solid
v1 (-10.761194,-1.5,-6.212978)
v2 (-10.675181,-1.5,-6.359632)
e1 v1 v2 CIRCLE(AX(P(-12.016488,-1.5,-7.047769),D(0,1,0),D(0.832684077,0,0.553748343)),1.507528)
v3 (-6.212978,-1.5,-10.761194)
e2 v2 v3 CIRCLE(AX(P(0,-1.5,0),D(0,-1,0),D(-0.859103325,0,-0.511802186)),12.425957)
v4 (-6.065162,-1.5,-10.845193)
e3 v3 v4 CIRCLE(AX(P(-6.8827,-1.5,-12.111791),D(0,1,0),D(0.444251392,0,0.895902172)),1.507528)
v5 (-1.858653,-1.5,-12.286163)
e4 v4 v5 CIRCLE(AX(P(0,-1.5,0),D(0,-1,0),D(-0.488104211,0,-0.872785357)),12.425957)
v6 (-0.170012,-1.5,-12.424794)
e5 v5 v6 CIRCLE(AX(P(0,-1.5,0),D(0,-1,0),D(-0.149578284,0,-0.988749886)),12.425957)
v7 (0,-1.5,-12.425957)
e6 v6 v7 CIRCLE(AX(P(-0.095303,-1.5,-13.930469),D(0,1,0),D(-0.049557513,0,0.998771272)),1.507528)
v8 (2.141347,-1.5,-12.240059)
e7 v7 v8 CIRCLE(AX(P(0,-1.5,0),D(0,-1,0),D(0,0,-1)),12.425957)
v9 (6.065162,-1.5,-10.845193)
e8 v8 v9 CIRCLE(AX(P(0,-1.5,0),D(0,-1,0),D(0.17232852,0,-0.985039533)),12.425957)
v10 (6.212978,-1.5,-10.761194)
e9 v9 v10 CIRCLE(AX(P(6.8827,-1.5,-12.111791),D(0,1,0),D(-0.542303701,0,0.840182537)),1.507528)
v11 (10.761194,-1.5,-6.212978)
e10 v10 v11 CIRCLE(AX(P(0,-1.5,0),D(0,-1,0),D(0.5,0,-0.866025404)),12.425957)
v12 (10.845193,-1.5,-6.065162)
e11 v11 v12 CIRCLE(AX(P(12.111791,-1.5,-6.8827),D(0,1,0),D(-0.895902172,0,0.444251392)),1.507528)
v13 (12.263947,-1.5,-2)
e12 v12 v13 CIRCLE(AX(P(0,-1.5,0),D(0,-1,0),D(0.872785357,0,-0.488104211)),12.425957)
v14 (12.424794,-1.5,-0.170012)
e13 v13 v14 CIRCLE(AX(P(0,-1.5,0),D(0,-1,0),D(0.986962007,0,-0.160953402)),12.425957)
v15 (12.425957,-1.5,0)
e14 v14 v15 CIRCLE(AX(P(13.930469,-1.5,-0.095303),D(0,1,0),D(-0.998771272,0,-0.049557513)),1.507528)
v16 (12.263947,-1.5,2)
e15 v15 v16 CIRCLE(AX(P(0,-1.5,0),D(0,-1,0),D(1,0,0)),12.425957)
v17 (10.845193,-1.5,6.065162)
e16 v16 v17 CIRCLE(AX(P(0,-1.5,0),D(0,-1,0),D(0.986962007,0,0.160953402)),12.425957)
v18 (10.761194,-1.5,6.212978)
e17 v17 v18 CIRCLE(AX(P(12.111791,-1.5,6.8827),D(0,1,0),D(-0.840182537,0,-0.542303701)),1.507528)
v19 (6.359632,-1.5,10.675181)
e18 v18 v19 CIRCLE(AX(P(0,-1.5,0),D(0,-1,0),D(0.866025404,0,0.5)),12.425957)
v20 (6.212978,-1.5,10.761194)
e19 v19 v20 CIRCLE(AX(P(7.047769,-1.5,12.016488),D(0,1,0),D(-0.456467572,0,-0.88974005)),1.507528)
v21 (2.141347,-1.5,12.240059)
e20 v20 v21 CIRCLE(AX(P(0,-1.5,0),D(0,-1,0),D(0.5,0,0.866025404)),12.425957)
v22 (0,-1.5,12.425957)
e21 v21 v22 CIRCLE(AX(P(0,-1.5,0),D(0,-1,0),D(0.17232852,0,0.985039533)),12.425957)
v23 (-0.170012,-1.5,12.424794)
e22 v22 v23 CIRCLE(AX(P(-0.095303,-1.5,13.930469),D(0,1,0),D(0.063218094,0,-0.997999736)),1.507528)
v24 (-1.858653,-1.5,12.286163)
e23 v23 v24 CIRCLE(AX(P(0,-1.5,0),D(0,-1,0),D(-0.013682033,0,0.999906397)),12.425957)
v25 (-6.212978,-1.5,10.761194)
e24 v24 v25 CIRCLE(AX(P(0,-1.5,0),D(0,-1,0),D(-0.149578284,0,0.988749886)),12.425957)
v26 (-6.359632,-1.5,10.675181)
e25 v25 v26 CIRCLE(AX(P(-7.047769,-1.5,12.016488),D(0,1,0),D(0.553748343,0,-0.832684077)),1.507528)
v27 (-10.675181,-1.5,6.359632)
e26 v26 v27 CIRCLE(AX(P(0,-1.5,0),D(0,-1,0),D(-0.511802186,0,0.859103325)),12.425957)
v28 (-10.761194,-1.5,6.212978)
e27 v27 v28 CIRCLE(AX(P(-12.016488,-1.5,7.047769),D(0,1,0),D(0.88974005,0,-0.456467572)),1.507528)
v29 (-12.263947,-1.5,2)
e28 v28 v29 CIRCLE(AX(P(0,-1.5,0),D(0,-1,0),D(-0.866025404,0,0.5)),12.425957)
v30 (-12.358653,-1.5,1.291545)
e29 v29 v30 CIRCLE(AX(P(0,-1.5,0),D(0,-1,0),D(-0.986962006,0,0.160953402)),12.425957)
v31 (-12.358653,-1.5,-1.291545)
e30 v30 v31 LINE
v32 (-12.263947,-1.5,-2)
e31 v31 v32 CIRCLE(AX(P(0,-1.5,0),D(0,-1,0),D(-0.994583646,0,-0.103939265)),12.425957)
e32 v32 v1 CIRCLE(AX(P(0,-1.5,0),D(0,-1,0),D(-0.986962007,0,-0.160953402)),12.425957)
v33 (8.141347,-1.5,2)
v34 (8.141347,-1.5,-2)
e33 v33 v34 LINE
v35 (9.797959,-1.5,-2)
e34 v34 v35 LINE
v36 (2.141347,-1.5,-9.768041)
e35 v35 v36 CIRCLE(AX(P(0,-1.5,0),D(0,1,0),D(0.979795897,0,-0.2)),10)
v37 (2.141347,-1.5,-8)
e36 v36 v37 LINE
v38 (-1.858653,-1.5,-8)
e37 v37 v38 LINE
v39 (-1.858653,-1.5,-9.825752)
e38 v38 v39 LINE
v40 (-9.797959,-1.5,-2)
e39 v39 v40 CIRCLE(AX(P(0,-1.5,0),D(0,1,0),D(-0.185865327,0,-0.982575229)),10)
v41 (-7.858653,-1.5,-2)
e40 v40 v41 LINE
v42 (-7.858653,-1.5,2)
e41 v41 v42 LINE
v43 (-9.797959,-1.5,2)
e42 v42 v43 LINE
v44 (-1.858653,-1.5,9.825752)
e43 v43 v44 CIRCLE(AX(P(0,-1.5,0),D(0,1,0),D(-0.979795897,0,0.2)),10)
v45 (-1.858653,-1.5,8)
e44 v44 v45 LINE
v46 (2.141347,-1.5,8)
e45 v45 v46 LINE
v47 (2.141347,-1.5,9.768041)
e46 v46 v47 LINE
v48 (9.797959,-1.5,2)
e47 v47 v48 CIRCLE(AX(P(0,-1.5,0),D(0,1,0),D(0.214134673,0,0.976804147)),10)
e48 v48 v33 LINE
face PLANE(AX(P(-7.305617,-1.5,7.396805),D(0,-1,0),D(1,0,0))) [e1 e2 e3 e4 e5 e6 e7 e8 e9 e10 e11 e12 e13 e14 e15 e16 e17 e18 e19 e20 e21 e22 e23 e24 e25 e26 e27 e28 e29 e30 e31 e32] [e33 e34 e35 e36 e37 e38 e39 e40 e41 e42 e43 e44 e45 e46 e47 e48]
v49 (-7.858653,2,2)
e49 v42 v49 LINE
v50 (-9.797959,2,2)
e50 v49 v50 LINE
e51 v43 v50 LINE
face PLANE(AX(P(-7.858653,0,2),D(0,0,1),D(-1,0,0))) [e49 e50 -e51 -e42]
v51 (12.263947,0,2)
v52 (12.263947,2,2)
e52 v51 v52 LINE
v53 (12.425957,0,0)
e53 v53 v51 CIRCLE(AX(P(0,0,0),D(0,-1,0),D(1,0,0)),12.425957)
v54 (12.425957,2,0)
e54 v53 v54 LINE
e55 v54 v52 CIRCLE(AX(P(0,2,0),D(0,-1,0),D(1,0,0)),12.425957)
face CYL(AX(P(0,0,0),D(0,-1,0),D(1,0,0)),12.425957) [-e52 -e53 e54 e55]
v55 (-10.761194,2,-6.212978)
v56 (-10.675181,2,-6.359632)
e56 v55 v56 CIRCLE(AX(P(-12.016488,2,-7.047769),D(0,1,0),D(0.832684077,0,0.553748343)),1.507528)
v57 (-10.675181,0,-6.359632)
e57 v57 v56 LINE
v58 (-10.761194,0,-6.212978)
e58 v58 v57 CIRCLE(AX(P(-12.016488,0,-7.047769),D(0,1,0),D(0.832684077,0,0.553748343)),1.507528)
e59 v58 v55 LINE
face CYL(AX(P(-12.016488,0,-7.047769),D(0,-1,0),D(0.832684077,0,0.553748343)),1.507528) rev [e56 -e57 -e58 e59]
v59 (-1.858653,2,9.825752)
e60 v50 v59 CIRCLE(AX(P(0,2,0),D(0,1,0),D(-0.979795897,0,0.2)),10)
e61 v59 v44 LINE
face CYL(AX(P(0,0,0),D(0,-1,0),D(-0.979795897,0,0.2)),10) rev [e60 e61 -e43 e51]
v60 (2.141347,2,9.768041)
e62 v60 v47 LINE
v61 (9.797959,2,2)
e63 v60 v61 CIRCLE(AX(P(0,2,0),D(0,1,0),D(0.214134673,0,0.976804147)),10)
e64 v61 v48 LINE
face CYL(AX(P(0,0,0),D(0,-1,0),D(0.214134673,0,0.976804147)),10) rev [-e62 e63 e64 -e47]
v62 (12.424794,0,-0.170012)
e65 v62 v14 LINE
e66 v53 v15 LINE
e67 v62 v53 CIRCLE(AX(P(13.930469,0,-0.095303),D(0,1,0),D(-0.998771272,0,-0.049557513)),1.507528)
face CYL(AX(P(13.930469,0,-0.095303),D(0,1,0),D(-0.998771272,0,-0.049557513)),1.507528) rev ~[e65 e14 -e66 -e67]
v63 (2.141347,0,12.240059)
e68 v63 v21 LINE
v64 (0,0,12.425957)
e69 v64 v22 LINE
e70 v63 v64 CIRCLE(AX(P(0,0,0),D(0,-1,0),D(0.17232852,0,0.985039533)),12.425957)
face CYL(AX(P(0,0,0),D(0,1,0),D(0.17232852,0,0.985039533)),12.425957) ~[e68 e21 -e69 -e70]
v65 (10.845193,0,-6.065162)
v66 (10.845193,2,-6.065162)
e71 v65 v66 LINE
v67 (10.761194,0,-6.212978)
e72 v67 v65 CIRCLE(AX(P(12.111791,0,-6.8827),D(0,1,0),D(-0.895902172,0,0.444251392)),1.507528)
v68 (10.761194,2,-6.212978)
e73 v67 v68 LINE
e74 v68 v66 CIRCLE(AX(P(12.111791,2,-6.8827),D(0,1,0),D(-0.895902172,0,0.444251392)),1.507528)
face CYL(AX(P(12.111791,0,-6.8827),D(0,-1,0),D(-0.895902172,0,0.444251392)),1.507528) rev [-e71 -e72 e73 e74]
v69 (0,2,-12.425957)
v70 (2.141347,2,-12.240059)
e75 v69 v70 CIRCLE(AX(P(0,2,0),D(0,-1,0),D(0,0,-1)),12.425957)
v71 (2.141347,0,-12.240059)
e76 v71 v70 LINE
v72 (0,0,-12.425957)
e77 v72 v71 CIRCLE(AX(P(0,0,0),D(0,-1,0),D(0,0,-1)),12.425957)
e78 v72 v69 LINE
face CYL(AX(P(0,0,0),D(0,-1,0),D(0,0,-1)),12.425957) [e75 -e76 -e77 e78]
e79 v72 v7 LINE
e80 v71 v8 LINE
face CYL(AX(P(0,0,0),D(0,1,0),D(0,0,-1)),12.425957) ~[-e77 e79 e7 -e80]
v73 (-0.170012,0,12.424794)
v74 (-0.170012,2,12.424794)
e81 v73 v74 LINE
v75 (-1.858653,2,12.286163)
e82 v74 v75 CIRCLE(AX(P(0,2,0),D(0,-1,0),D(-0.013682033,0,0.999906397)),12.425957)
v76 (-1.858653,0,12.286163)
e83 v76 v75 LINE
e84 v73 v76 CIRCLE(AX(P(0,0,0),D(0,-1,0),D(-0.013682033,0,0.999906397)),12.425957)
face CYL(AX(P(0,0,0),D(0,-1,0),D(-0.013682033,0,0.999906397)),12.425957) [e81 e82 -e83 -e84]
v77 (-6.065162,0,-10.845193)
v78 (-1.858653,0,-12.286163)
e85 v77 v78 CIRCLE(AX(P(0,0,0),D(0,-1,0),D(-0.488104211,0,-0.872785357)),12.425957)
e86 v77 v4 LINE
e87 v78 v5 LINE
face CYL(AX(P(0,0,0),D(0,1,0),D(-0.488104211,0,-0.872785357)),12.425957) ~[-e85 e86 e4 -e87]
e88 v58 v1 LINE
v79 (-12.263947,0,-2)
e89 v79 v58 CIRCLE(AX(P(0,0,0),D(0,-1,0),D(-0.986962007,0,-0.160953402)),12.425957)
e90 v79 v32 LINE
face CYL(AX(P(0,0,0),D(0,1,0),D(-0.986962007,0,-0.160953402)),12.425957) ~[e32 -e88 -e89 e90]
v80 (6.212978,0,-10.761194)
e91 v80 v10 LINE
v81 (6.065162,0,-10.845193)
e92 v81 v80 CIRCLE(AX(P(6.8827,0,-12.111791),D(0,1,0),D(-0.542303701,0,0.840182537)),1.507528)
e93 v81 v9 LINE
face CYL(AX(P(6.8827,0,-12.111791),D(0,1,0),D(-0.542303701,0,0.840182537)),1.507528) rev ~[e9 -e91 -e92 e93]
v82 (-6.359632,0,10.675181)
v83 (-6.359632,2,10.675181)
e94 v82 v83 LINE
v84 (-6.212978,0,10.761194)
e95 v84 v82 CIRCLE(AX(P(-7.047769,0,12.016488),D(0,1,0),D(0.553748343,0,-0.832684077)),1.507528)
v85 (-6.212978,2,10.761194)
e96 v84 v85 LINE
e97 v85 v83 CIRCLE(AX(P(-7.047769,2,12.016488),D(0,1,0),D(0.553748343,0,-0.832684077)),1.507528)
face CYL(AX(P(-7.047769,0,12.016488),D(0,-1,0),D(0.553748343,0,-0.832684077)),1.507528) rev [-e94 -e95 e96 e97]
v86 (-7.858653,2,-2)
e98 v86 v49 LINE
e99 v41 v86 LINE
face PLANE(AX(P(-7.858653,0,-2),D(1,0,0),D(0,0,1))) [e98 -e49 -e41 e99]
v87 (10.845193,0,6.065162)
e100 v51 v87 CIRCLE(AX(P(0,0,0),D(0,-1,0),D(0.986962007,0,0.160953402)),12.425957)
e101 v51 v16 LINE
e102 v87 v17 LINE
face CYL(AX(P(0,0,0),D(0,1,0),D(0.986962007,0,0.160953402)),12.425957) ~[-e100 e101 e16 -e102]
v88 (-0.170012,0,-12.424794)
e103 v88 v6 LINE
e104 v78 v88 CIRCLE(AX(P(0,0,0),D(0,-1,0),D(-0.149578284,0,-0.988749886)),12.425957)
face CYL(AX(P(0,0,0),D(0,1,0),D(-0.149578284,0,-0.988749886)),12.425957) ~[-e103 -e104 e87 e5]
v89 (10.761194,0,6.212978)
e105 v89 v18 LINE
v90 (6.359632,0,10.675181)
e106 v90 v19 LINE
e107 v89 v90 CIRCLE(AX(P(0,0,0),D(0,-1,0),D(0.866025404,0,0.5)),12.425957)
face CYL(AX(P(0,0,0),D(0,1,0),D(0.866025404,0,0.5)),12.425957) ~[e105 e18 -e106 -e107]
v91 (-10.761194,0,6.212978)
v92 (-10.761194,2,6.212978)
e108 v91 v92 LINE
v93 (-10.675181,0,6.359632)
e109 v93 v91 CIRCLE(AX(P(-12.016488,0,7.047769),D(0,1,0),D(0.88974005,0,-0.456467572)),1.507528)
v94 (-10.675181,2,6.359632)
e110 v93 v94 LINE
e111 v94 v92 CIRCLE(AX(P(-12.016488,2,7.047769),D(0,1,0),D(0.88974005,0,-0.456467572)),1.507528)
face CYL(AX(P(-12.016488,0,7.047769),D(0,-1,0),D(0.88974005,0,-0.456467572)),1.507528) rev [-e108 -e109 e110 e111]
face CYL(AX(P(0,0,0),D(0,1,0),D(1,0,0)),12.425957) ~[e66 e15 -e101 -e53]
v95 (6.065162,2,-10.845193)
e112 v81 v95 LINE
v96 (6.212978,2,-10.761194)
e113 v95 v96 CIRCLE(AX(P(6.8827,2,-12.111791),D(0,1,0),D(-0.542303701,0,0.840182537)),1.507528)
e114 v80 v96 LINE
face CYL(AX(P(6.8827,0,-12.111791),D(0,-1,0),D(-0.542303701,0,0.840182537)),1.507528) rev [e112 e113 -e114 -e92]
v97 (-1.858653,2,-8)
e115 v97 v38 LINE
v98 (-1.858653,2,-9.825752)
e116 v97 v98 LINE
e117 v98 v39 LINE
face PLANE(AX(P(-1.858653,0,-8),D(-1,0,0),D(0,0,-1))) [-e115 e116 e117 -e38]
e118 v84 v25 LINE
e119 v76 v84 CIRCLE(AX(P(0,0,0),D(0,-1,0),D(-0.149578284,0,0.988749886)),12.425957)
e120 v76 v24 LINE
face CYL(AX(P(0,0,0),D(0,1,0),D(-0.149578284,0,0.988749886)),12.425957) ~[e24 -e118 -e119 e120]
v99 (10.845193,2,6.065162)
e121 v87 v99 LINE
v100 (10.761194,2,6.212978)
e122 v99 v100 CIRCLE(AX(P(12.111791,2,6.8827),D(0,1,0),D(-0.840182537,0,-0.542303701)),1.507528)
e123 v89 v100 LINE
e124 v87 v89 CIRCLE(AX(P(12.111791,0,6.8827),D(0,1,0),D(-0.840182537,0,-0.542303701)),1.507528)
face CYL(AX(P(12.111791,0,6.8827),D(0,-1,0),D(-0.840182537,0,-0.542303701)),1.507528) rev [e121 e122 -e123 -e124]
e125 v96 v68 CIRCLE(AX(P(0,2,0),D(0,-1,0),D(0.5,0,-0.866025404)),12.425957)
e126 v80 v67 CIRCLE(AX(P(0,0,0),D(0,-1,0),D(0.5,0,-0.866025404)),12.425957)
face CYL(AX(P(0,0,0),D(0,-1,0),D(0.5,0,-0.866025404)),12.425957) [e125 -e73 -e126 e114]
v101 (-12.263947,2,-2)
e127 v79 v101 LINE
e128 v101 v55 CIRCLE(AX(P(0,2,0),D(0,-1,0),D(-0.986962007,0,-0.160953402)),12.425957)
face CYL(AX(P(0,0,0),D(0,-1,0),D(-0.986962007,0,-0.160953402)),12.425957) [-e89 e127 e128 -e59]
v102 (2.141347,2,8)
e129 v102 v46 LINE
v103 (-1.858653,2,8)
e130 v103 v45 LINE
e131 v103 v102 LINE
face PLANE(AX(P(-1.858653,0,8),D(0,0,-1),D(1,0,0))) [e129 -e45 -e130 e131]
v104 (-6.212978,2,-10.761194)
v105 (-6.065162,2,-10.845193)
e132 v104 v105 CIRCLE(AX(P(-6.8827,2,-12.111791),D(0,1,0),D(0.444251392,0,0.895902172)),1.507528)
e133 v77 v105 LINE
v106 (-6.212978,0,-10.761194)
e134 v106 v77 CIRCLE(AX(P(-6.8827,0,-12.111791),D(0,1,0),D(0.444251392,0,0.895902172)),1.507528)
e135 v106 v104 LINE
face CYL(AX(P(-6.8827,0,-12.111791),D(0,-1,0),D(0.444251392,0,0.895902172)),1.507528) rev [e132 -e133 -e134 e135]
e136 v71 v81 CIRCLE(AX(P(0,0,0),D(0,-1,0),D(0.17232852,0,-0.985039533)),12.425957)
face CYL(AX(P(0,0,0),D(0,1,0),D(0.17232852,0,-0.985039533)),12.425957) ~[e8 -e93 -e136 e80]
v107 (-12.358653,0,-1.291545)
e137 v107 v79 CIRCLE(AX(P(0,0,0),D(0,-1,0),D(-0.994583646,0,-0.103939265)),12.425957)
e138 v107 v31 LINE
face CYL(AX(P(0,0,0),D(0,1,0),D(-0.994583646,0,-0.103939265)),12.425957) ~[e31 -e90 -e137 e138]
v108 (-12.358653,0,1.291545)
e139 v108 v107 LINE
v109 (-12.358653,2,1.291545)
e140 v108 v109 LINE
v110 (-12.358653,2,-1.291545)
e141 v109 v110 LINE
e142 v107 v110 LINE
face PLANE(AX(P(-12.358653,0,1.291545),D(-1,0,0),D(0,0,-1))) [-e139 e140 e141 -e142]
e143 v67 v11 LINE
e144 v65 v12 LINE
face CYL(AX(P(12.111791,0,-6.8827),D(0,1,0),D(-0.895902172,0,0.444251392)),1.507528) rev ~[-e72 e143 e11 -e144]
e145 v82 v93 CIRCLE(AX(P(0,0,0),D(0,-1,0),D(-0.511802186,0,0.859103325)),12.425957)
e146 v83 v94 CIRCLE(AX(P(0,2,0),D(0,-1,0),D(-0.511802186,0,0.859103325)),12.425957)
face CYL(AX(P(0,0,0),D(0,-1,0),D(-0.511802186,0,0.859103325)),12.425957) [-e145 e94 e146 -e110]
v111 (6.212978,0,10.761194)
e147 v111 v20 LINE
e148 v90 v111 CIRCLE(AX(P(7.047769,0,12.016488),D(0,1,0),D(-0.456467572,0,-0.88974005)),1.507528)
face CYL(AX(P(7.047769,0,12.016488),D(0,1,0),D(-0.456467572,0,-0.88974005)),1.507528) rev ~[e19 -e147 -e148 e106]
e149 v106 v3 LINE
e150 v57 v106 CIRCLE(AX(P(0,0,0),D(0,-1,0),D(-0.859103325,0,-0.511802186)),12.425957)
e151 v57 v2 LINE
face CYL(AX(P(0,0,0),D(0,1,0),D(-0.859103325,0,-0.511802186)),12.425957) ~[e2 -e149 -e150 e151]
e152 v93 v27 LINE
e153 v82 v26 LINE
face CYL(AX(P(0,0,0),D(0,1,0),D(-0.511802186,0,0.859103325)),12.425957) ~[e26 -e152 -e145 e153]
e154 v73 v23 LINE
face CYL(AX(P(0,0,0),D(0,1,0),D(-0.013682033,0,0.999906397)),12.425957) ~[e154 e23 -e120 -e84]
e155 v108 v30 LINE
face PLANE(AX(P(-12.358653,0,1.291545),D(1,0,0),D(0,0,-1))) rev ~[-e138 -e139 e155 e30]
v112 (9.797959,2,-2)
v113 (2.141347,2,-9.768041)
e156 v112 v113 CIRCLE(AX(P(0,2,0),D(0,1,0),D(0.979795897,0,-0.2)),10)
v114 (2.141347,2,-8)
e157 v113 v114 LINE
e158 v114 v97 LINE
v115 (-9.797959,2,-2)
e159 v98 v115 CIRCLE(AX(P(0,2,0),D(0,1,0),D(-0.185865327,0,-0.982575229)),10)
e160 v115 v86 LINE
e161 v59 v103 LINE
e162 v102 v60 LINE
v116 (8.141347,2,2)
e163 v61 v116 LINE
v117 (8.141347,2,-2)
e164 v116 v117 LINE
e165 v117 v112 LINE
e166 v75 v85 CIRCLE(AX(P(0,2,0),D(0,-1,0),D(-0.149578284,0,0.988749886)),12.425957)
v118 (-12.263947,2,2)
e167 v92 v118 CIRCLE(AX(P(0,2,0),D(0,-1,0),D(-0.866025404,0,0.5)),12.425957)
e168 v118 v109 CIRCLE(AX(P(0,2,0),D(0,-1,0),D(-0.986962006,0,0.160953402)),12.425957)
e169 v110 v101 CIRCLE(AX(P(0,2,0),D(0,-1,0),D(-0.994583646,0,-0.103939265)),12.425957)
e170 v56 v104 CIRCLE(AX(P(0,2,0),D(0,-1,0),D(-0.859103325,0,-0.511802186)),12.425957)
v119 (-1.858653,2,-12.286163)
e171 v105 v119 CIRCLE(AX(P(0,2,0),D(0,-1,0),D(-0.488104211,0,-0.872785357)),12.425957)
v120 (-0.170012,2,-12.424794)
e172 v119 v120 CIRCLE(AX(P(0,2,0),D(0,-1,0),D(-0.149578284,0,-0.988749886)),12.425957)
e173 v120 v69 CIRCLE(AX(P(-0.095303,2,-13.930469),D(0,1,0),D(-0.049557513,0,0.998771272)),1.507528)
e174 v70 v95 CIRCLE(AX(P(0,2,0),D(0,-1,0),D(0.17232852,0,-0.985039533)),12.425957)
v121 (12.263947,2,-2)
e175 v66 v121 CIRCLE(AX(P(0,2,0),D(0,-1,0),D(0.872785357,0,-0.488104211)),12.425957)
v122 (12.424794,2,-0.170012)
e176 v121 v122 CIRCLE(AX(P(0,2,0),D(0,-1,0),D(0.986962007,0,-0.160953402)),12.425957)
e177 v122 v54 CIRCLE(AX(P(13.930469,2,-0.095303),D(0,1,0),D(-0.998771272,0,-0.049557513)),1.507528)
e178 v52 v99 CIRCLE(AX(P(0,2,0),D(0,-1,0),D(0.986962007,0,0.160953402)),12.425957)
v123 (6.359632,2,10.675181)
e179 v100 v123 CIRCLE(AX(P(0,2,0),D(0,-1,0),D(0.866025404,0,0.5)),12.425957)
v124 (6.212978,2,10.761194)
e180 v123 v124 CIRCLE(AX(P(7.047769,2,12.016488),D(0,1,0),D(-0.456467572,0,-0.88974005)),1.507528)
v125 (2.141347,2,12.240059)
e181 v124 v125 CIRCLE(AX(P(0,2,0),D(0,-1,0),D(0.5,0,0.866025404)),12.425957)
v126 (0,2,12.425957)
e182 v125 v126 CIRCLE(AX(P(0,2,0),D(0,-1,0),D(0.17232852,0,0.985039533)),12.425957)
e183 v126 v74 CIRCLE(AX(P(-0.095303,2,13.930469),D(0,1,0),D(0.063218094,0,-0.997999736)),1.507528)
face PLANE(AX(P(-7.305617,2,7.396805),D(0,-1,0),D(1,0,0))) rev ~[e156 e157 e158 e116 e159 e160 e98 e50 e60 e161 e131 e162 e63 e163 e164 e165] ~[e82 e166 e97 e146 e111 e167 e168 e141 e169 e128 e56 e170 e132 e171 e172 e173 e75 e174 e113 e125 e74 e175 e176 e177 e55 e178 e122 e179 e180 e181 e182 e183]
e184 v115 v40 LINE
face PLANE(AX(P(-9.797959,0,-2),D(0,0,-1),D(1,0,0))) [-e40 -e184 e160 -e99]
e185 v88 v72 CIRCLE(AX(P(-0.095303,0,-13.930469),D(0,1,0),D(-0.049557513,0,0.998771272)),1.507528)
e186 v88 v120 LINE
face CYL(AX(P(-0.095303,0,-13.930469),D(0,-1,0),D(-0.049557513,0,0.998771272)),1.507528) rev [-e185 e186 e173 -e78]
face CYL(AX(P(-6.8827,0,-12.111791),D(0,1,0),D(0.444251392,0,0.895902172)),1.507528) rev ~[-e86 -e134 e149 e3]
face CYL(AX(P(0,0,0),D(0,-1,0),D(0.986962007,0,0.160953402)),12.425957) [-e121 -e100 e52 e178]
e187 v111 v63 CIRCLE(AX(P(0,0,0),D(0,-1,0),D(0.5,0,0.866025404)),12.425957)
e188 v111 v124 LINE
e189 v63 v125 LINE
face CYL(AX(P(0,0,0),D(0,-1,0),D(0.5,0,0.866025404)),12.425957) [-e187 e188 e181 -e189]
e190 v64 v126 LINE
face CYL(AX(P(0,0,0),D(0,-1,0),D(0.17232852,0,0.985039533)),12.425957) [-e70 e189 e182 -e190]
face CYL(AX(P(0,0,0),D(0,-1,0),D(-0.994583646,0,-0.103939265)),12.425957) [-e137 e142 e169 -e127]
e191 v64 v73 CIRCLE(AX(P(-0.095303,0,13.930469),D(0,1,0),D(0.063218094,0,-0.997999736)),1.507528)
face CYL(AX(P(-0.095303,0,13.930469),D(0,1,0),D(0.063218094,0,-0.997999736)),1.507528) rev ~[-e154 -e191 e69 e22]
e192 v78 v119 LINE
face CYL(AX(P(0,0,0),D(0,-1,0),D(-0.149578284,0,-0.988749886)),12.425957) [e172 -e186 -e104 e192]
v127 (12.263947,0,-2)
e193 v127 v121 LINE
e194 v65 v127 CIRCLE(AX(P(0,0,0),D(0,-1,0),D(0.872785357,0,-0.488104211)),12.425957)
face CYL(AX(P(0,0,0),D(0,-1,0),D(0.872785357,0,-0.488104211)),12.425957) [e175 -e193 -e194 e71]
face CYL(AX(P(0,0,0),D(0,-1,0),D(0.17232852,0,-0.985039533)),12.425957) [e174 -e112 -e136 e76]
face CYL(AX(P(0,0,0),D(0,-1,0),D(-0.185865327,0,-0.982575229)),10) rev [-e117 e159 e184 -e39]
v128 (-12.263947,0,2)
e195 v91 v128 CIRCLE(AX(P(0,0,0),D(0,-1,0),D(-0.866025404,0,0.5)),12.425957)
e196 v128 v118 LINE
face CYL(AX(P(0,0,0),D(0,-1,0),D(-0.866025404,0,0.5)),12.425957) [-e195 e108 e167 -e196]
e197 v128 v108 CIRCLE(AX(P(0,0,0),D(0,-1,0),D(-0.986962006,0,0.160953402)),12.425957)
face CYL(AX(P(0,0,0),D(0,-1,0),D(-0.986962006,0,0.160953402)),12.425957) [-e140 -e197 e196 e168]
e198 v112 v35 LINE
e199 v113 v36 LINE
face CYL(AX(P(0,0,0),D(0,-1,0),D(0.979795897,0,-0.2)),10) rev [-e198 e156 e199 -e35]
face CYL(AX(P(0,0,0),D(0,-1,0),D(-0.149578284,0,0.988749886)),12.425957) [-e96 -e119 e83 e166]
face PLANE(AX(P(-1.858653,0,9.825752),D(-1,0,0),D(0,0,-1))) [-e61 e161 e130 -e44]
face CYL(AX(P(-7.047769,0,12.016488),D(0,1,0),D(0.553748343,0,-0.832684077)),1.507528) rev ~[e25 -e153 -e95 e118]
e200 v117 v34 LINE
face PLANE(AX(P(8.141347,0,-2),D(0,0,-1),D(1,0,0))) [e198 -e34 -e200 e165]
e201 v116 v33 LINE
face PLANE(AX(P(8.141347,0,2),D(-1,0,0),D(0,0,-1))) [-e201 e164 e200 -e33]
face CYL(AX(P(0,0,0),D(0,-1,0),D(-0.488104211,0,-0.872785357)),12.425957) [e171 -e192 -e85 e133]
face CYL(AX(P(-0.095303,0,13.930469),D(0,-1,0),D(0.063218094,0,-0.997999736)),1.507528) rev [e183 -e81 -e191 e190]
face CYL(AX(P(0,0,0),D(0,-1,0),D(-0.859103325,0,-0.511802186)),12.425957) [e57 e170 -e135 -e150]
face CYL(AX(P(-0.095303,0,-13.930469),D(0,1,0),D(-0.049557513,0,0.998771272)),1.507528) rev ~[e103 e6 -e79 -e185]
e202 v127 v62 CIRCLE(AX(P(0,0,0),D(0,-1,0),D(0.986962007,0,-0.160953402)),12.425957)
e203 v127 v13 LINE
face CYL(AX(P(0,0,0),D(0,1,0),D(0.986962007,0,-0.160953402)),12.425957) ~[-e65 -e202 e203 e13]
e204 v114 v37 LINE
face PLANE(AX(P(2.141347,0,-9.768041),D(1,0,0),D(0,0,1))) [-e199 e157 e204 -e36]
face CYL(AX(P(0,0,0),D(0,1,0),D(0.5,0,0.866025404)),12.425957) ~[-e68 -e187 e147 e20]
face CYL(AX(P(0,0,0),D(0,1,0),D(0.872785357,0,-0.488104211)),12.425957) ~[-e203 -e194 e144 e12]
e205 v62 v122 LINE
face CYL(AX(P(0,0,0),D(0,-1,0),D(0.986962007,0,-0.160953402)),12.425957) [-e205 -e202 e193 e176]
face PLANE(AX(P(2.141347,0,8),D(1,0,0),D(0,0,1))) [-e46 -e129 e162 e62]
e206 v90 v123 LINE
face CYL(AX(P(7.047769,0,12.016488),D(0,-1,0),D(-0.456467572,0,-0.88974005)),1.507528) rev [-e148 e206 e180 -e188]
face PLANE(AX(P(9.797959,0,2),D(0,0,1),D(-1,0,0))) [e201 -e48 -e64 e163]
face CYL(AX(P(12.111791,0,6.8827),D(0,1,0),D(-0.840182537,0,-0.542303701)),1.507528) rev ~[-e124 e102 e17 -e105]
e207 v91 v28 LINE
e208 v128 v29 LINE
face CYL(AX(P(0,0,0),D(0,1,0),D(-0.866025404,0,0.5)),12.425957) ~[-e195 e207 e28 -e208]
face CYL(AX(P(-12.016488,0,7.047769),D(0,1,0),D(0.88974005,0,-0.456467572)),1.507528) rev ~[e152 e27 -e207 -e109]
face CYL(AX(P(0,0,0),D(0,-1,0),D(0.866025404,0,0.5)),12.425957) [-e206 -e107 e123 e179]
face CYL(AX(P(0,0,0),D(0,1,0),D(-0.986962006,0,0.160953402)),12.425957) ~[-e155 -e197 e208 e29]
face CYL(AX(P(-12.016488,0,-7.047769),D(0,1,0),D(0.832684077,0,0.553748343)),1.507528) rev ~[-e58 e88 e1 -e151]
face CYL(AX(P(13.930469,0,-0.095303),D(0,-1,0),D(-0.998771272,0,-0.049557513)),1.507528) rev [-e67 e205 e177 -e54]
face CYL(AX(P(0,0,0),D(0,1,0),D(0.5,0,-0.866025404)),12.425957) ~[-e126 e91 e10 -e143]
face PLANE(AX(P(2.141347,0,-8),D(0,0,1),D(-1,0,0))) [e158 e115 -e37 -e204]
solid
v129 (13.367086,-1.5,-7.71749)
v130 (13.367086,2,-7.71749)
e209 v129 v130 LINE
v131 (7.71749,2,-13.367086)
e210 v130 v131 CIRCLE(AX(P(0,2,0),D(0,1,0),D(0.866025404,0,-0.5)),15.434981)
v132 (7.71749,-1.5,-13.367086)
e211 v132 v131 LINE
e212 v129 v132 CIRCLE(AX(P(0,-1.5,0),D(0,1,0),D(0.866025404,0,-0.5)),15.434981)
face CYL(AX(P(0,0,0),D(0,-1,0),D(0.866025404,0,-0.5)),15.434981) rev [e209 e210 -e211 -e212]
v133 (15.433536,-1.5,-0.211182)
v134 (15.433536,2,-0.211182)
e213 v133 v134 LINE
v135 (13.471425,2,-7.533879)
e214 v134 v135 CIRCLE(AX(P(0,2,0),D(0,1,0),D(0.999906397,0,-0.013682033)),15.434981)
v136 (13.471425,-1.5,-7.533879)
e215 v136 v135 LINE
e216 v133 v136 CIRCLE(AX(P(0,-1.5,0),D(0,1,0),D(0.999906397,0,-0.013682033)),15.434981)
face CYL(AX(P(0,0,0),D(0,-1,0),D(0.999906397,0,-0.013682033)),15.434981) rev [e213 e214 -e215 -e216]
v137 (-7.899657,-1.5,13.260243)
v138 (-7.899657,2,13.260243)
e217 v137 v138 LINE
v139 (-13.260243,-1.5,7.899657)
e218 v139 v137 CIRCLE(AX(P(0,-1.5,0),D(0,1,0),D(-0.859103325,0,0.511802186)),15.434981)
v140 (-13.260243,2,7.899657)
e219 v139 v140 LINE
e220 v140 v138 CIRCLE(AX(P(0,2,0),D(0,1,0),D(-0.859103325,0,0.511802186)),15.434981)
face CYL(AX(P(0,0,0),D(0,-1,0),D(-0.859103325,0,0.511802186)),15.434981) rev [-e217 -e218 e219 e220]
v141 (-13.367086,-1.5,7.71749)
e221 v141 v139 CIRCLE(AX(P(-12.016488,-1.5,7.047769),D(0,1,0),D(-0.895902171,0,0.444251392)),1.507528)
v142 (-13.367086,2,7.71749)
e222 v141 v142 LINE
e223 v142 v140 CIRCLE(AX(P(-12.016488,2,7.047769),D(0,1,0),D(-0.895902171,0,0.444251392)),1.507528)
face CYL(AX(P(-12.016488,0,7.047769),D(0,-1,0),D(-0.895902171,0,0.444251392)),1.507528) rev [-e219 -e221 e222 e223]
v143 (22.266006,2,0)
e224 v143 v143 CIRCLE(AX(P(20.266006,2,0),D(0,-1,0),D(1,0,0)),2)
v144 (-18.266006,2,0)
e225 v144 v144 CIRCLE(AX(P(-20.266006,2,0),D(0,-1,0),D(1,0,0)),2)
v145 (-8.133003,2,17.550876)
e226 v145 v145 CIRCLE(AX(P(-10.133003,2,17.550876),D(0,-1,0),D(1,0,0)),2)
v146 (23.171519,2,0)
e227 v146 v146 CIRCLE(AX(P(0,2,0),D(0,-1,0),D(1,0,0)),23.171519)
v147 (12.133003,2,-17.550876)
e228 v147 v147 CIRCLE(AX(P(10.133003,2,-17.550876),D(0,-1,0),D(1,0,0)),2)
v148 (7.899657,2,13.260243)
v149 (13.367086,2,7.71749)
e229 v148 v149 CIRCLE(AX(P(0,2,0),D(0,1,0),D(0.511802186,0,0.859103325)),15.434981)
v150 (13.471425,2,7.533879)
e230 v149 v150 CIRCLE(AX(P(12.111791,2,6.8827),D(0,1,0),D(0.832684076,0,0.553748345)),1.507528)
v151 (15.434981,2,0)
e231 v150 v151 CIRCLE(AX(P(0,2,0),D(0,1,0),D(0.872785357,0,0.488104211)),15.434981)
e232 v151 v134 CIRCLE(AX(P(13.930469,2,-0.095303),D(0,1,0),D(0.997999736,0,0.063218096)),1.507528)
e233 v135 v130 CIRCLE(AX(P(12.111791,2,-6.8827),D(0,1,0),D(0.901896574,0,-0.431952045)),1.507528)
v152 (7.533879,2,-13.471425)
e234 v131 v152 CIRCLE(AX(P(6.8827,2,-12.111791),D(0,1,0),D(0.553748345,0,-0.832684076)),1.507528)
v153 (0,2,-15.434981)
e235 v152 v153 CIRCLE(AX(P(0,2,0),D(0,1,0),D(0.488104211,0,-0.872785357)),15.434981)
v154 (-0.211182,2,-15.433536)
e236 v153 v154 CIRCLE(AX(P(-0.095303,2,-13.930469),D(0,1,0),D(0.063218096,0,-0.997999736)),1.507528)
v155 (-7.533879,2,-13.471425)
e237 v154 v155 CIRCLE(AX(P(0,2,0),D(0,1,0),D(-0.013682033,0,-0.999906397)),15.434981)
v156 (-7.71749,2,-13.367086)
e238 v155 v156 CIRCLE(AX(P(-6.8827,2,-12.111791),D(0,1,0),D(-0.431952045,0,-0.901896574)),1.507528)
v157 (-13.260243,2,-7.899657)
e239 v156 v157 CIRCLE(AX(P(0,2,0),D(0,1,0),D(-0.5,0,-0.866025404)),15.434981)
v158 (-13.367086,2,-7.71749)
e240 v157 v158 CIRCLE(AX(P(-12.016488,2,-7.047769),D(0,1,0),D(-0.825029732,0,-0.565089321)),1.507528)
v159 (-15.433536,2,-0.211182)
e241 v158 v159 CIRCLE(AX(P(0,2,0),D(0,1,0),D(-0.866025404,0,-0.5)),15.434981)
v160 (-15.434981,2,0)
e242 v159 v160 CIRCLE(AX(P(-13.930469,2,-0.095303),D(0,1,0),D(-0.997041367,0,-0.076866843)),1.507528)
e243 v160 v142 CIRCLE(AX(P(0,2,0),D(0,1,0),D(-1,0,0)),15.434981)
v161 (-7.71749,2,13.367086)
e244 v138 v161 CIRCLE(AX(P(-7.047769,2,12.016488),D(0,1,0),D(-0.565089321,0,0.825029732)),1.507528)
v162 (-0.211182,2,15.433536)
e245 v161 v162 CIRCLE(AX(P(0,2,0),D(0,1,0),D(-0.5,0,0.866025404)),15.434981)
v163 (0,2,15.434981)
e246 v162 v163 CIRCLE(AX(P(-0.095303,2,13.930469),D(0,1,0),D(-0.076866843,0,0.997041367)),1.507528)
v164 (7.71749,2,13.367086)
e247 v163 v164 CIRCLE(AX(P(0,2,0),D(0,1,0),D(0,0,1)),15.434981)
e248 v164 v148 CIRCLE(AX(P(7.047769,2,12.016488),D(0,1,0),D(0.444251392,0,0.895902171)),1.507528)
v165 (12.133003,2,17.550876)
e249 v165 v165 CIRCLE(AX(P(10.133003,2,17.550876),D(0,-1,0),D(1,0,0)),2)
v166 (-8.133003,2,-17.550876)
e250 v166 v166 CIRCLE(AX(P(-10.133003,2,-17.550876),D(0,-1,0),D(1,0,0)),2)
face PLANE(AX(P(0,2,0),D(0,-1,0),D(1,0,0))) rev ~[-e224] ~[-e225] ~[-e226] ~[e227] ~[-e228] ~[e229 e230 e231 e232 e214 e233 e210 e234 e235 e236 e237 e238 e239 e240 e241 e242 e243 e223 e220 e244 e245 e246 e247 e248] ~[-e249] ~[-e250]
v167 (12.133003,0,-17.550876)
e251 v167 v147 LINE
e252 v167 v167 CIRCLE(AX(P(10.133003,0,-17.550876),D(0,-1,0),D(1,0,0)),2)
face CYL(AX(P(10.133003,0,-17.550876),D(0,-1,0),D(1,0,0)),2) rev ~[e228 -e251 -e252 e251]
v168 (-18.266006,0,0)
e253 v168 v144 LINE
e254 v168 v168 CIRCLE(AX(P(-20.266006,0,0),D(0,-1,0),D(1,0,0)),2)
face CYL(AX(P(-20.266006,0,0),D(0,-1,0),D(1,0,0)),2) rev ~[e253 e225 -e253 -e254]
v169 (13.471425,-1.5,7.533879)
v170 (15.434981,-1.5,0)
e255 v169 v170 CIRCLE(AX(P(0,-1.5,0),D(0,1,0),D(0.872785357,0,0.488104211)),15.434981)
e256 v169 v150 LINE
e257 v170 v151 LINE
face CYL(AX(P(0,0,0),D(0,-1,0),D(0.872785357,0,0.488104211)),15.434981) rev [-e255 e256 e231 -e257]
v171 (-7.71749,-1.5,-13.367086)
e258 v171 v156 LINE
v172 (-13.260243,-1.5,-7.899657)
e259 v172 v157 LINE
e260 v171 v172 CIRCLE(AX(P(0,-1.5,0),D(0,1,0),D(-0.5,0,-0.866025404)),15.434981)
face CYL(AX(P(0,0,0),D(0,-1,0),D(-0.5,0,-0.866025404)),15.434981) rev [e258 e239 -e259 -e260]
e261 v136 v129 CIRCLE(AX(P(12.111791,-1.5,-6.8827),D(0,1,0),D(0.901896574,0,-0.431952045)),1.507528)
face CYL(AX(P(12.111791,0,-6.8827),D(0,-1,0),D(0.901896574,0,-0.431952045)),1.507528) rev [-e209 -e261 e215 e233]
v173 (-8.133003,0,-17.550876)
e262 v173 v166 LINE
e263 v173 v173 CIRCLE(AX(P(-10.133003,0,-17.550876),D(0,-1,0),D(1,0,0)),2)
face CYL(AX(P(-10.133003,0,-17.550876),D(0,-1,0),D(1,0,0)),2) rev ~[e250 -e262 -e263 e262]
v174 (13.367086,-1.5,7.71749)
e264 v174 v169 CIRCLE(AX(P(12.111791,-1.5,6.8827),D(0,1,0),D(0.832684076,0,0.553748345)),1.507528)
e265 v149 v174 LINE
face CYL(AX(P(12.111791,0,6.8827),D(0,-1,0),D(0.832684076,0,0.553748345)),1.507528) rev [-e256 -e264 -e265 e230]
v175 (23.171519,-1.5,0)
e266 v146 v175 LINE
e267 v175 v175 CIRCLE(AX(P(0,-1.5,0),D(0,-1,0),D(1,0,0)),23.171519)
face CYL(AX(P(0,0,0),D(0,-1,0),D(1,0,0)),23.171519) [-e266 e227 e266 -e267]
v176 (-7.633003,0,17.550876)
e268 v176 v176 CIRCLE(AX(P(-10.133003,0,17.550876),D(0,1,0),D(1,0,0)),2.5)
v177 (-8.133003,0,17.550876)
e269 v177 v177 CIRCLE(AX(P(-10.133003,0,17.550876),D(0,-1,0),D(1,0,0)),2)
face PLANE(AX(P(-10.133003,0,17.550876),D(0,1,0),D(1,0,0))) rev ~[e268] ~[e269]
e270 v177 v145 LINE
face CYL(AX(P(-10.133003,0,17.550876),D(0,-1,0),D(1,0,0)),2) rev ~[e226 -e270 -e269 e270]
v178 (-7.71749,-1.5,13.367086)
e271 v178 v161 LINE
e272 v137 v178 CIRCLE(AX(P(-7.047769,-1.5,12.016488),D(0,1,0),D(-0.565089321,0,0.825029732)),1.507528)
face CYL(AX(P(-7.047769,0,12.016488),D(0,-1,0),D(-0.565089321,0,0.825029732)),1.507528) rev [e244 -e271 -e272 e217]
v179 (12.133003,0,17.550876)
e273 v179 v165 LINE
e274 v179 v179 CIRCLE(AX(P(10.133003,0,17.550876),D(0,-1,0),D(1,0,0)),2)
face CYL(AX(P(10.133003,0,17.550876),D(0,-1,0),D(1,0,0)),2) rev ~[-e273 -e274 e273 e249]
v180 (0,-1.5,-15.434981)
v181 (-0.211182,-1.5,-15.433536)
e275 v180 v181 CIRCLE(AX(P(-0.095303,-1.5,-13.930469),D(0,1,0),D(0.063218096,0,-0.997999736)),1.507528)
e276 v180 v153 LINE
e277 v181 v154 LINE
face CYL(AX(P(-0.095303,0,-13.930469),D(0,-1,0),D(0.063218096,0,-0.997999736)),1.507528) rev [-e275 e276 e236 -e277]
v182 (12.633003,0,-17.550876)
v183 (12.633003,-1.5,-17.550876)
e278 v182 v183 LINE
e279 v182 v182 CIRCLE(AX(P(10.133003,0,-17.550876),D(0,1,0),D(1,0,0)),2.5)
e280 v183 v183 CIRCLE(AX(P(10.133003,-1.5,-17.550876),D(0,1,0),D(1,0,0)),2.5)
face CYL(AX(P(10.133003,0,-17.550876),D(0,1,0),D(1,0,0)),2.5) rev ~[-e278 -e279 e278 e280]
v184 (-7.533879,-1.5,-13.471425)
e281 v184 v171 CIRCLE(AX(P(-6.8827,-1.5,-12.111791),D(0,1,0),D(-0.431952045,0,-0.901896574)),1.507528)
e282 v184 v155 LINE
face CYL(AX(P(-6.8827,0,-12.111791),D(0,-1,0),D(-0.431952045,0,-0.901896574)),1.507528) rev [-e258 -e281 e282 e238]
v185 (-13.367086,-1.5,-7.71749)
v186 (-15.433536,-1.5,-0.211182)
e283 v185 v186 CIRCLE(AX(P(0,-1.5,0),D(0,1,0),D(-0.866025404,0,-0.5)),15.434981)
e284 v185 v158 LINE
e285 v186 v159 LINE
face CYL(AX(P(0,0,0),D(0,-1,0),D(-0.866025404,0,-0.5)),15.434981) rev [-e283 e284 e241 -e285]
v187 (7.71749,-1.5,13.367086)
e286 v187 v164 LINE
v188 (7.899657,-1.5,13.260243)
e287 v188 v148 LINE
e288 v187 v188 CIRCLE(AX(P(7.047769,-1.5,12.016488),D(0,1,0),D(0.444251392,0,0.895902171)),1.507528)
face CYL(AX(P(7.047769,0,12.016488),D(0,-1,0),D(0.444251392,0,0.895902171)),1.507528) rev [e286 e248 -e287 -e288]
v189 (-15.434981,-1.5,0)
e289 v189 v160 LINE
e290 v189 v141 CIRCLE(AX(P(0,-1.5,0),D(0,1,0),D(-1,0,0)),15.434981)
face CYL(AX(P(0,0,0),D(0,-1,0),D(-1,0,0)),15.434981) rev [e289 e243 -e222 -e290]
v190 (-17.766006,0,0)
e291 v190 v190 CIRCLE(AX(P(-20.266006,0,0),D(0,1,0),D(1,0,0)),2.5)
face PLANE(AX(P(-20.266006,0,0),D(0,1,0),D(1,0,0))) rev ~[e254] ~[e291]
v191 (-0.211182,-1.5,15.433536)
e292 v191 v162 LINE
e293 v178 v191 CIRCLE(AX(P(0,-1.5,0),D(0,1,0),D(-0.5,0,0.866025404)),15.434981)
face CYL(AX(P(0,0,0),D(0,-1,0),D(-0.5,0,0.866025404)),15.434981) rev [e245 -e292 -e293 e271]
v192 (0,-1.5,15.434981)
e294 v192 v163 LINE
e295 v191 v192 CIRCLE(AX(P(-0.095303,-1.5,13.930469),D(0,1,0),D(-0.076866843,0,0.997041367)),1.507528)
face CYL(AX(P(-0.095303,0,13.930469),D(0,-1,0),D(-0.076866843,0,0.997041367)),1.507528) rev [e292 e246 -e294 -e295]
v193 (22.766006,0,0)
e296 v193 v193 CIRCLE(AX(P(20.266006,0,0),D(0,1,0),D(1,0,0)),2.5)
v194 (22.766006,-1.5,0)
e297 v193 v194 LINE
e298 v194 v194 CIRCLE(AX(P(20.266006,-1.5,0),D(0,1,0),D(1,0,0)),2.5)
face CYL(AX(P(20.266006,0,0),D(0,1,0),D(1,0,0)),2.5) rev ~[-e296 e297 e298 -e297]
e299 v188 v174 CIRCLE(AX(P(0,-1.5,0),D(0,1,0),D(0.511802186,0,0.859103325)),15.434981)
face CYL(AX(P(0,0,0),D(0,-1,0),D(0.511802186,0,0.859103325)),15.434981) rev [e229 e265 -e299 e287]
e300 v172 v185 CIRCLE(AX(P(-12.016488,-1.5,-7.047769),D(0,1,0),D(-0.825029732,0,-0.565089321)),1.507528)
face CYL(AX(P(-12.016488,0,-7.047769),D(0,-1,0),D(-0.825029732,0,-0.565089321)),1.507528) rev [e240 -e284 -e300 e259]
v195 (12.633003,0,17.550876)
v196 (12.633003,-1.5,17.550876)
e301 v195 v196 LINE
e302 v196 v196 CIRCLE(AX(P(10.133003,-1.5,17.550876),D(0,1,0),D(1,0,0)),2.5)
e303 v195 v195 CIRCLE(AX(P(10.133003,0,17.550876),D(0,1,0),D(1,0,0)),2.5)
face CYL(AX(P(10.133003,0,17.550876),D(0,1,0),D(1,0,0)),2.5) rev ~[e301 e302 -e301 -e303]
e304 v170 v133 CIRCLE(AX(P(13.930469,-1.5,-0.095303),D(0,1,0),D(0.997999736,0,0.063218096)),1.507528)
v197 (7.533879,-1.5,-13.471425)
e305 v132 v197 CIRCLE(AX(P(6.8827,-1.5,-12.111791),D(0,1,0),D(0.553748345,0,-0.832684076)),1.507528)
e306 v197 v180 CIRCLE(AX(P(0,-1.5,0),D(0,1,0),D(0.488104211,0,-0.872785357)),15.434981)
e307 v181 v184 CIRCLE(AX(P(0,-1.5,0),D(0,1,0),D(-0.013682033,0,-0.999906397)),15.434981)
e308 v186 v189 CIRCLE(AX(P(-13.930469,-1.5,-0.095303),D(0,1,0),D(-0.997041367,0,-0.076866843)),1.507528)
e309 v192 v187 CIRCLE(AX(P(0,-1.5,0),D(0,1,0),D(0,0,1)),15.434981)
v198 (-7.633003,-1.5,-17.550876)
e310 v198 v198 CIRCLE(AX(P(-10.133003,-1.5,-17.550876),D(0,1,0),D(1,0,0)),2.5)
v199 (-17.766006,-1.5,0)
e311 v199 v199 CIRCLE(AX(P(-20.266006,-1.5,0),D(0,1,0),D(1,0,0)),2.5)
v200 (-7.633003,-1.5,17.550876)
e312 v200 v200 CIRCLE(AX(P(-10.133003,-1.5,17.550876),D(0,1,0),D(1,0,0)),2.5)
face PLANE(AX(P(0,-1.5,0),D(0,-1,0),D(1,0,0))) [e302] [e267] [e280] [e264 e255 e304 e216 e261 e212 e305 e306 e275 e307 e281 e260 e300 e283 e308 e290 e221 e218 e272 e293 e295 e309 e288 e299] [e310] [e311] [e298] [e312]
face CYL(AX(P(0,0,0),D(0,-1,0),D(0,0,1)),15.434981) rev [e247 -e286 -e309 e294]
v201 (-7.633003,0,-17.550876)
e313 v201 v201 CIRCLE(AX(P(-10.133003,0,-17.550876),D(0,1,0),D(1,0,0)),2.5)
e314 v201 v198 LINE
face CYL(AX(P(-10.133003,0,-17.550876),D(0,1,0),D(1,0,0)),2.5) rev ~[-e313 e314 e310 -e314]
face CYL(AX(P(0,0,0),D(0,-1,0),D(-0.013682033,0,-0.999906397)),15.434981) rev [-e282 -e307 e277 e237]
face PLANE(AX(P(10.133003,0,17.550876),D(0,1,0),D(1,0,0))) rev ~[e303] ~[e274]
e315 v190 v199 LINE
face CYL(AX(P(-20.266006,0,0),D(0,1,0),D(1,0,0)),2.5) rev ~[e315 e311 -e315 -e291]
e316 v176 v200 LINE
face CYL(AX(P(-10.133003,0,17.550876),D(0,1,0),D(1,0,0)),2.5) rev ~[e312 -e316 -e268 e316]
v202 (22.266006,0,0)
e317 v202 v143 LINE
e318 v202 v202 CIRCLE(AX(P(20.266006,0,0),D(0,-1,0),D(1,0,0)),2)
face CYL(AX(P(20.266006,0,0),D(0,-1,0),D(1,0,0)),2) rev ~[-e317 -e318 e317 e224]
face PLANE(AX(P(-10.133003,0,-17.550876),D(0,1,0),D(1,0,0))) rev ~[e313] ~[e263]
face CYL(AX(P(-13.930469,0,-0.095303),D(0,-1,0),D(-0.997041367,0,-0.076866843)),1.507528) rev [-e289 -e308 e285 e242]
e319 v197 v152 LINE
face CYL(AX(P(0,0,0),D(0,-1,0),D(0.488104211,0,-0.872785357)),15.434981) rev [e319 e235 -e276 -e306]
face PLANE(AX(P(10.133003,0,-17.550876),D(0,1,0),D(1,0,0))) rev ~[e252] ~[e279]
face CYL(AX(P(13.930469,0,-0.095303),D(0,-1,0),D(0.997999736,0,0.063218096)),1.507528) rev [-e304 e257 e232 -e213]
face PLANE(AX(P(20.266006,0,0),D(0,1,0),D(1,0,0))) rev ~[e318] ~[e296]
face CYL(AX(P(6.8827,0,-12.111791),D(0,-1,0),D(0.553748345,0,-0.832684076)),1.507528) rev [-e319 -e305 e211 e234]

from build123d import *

# Parameters (mm, degrees)
F1_DEPTH      = 1.5
F1_DEPTH_BACK = 2
F0_R          = 23.1715188415
F14_D         = 4
F14_DEPTH     = 2.001
F15_D         = 5
F15_DEPTH     = 2
F15_TIP       = 1.5021515476


# Not quite as in the source:
# - the program builds the solid bodies; features that only make, move or delete a surface that nothing else refers to are left out


with BuildPart() as f1:
    # F0 (on Front) → F1 (new body, two sides)
    with BuildSketch(Plane.XZ) as f1_sk:
        with BuildLine():
            ThreePointArc((-9.7979589711, 2), (-7.0199538443, 7.1218149389), (-1.8586532747, 9.8257522869))
            Line((-1.8586532747, 9.8257522869), (-1.8586532747, 12.2861632234))
            ThreePointArc((-1.8586532747, 12.2861632234), (-4.1072121765, 11.7275405301), (-6.2129783266, 10.761194128))
            ThreePointArc((-6.2129783266, 10.761194128), (-6.2850915316, 10.7161183391), (-6.3596317791, 10.6751806721))
            ThreePointArc((-6.3596317791, 10.6751806721), (-8.7864782122, 8.7864782122), (-10.6751806721, 6.3596317791))
            ThreePointArc((-10.6751806721, 6.3596317791), (-10.7161183391, 6.2850915316), (-10.761194128, 6.2129783266))
            ThreePointArc((-10.761194128, 6.2129783266), (-11.7036993668, 4.174664044), (-12.2639471113, 2))
            Line((-12.2639471113, 2), (-9.7979589711, 2))
        make_face()
        with BuildLine():
            ThreePointArc((-9.7979589711, -2), (-10, 0), (-9.7979589711, 2))
            Line((-9.7979589711, 2), (-12.2639471113, 2))
            ThreePointArc((-12.2639471113, 2), (-12.3163951558, 1.6464534963), (-12.3586532747, 1.2915448051))
            Line((-12.3586532747, 1.2915448051), (-12.3586532747, -1.2915448051))
            ThreePointArc((-12.3586532747, -1.2915448051), (-12.3163951558, -1.6464534963), (-12.2639471113, -2))
            Line((-12.2639471113, -2), (-9.7979589711, -2))
        make_face()
        with BuildLine():
            Line((-7.8586532747, 2), (-9.7979589711, 2))
            ThreePointArc((-9.7979589711, 2), (-10, 0), (-9.7979589711, -2))
            Line((-9.7979589711, -2), (-7.8586532747, -2))
            Line((-7.8586532747, -2), (-7.8586532747, 2))
        make_face()
        with BuildLine():
            Line((-1.8586532747, -12.2861632234), (-1.8586532747, -9.8257522869))
            ThreePointArc((-1.8586532747, -9.8257522869), (-7.0199538443, -7.1218149389), (-9.7979589711, -2))
            Line((-9.7979589711, -2), (-12.2639471113, -2))
            ThreePointArc((-12.2639471113, -2), (-11.7036993668, -4.174664044), (-10.761194128, -6.2129783266))
            ThreePointArc((-10.761194128, -6.2129783266), (-10.7161183391, -6.2850915316), (-10.6751806721, -6.3596317791))
            ThreePointArc((-10.6751806721, -6.3596317791), (-8.7261627517, -8.8463824459), (-6.2129783266, -10.761194128))
            ThreePointArc((-6.2129783266, -10.761194128), (-6.1378849458, -10.801108101), (-6.0651617625, -10.8451930155))
            ThreePointArc((-6.0651617625, -10.8451930155), (-4.02688589, -11.7553642554), (-1.8586532747, -12.2861632234))
        make_face()
        with BuildLine():
            Line((2.1413467253, -12.2400585354), (2.1413467253, -9.7680414722))
            ThreePointArc((2.1413467253, -9.7680414722), (0.144262023, -9.9989593693), (-1.8586532747, -9.8257522869))
            Line((-1.8586532747, -9.8257522869), (-1.8586532747, -12.2861632234))
            ThreePointArc((-1.8586532747, -12.2861632234), (-1.0166984011, -12.3842934037), (-0.1700123434, -12.4247935416))
            ThreePointArc((-0.1700123434, -12.4247935416), (-0.0849897619, -12.4229764774), (0, -12.4259566532))
            ThreePointArc((0, -12.4259566532), (1.0747004127, -12.3793948871), (2.1413467253, -12.2400585354))
        make_face()
        with BuildLine():
            ThreePointArc((-1.8586532747, -9.8257522869), (0.144262023, -9.9989593693), (2.1413467253, -9.7680414722))
            Line((2.1413467253, -9.7680414722), (2.1413467253, -8))
            Line((2.1413467253, -8), (-1.8586532747, -8))
            Line((-1.8586532747, -8), (-1.8586532747, -9.8257522869))
        make_face()
        with BuildLine():
            Line((12.2639471113, -2), (9.7979589711, -2))
            ThreePointArc((9.7979589711, -2), (7.1219640694, -7.0198025466), (2.1413467253, -9.7680414722))
            Line((2.1413467253, -9.7680414722), (2.1413467253, -12.2400585354))
            ThreePointArc((2.1413467253, -12.2400585354), (4.1621037763, -11.708171971), (6.0651617625, -10.8451930155))
            ThreePointArc((6.0651617625, -10.8451930155), (6.1378849458, -10.801108101), (6.2129783266, -10.761194128))
            ThreePointArc((6.2129783266, -10.761194128), (8.7864782122, -8.7864782122), (10.761194128, -6.2129783266))
            ThreePointArc((10.761194128, -6.2129783266), (10.801108101, -6.1378849458), (10.8451930155, -6.0651617625))
            ThreePointArc((10.8451930155, -6.0651617625), (11.7319851001, -4.0944992807), (12.2639471113, -2))
        make_face()
        with BuildLine():
            ThreePointArc((9.7979589711, 2), (9.9493615301, 1.0050896201), (10, 0))
            ThreePointArc((10, 0), (9.9493615301, -1.0050896201), (9.7979589711, -2))
            Line((9.7979589711, -2), (12.2639471113, -2))
            ThreePointArc((12.2639471113, -2), (12.3782346262, -1.0879826681), (12.4247935416, -0.1700123434))
            ThreePointArc((12.4247935416, -0.1700123434), (12.4229764774, -0.0849897619), (12.4259566532, 0))
            ThreePointArc((12.4259566532, 0), (12.385388043, 1.0032755219), (12.2639471113, 2))
            Line((12.2639471113, 2), (9.7979589711, 2))
        make_face()
        with BuildLine():
            ThreePointArc((9.7979589711, -2), (9.9493615301, -1.0050896201), (10, 0))
            ThreePointArc((10, 0), (9.9493615301, 1.0050896201), (9.7979589711, 2))
            Line((9.7979589711, 2), (8.1413467253, 2))
            Line((8.1413467253, 2), (8.1413467253, -2))
            Line((8.1413467253, -2), (9.7979589711, -2))
        make_face()
        with BuildLine():
            ThreePointArc((2.1413467253, 9.7680414722), (7.1219640694, 7.0198025466), (9.7979589711, 2))
            Line((9.7979589711, 2), (12.2639471113, 2))
            ThreePointArc((12.2639471113, 2), (11.7319851001, 4.0944992807), (10.8451930155, 6.0651617625))
            ThreePointArc((10.8451930155, 6.0651617625), (10.801108101, 6.1378849458), (10.761194128, 6.2129783266))
            ThreePointArc((10.761194128, 6.2129783266), (8.8463824459, 8.7261627517), (6.3596317791, 10.6751806721))
            ThreePointArc((6.3596317791, 10.6751806721), (6.2850915316, 10.7161183391), (6.2129783266, 10.761194128))
            ThreePointArc((6.2129783266, 10.761194128), (4.2421040478, 11.6794243007), (2.1413467253, 12.2400585354))
            Line((2.1413467253, 12.2400585354), (2.1413467253, 9.7680414722))
        make_face()
        with BuildLine():
            ThreePointArc((-1.8586532747, 9.8257522869), (0.144262023, 9.9989593693), (2.1413467253, 9.7680414722))
            Line((2.1413467253, 9.7680414722), (2.1413467253, 12.2400585354))
            ThreePointArc((2.1413467253, 12.2400585354), (1.0747004127, 12.3793948871), (0, 12.4259566532))
            ThreePointArc((0, 12.4259566532), (-0.0849897619, 12.4229764774), (-0.1700123434, 12.4247935416))
            ThreePointArc((-0.1700123434, 12.4247935416), (-1.0166984011, 12.3842934037), (-1.8586532747, 12.2861632234))
            Line((-1.8586532747, 12.2861632234), (-1.8586532747, 9.8257522869))
        make_face()
        with BuildLine():
            Line((2.1413467253, 8), (2.1413467253, 9.7680414722))
            ThreePointArc((2.1413467253, 9.7680414722), (0.144262023, 9.9989593693), (-1.8586532747, 9.8257522869))
            Line((-1.8586532747, 9.8257522869), (-1.8586532747, 8))
            Line((-1.8586532747, 8), (2.1413467253, 8))
        make_face()
    extrude(amount=F1_DEPTH)
    extrude(f1_sk.sketch, amount=-F1_DEPTH_BACK)


with BuildPart() as f1b:
    # F0 (on Front) → F1, piece 2 (new body, two sides)
    with BuildSketch(Plane.XZ) as f1_2_sk:
        Circle(F0_R)
        Polygon((10.1330032136, 17.5508763992), (20.2660064272, 0), (10.1330032136, -17.5508763992), (-10.1330032136, -17.5508763992), (-20.2660064272, 0), (-10.1330032136, 17.5508763992), align=None, mode=Mode.SUBTRACT)
        Polygon((10.1330032136, -17.5508763992), (20.2660064272, 0), (10.1330032136, 17.5508763992), (-10.1330032136, 17.5508763992), (-20.2660064272, 0), (-10.1330032136, -17.5508763992), align=None)
        with BuildLine():
            ThreePointArc((13.3670856415, 7.7174904934), (13.4224746928, 7.6275141941), (13.4714253931, 7.5338792094))
            ThreePointArc((13.4714253931, 7.5338792094), (14.936027465, 3.8927781375), (15.4349809868, 0))
            ThreePointArc((15.4349809868, 0), (15.4379611627, -0.1056162866), (15.4335362203, -0.2111819122))
            ThreePointArc((15.4335362203, -0.2111819122), (14.9090467635, -3.9948670402), (13.4714253931, -7.5338792094))
            ThreePointArc((13.4714253931, -7.5338792094), (13.4224746928, -7.6275141941), (13.3670856415, -7.7174904934))
            ThreePointArc((13.3670856415, -7.7174904934), (10.9141797233, -10.9141797233), (7.7174904934, -13.3670856415))
            ThreePointArc((7.7174904934, -13.3670856415), (7.6275141941, -13.4224746928), (7.5338792094, -13.4714253931))
            ThreePointArc((7.5338792094, -13.4714253931), (3.8927781375, -14.936027465), (0, -15.4349809868))
            ThreePointArc((0, -15.4349809868), (-0.1056162866, -15.4379611627), (-0.2111819122, -15.4335362203))
            ThreePointArc((-0.2111819122, -15.4335362203), (-3.9948670402, -14.9090467635), (-7.5338792094, -13.4714253931))
            ThreePointArc((-7.5338792094, -13.4714253931), (-7.6275141941, -13.4224746928), (-7.7174904934, -13.3670856415))
            ThreePointArc((-7.7174904934, -13.3670856415), (-10.8392584909, -10.9885901476), (-13.2602434809, -7.899657011))
            ThreePointArc((-13.2602434809, -7.899657011), (-13.3168584062, -7.8104469685), (-13.3670856415, -7.7174904934))
            ThreePointArc((-13.3670856415, -7.7174904934), (-14.8813682851, -4.0967689742), (-15.4335362203, -0.2111819122))
            ThreePointArc((-15.4335362203, -0.2111819122), (-15.4379611627, -0.1056162866), (-15.4349809868, 0))
            ThreePointArc((-15.4349809868, 0), (-14.9090467635, 3.9948670402), (-13.3670856415, 7.7174904934))
            ThreePointArc((-13.3670856415, 7.7174904934), (-13.3168584062, 7.8104469685), (-13.2602434809, 7.899657011))
            ThreePointArc((-13.2602434809, 7.899657011), (-10.9141797233, 10.9141797233), (-7.899657011, 13.2602434809))
            ThreePointArc((-7.899657011, 13.2602434809), (-7.8104469685, 13.3168584062), (-7.7174904934, 13.3670856415))
            ThreePointArc((-7.7174904934, 13.3670856415), (-4.0967689742, 14.8813682851), (-0.2111819122, 15.4335362203))
            ThreePointArc((-0.2111819122, 15.4335362203), (-0.1056162866, 15.4379611627), (0, 15.4349809868))
            ThreePointArc((0, 15.4349809868), (3.9948670402, 14.9090467635), (7.7174904934, 13.3670856415))
            ThreePointArc((7.7174904934, 13.3670856415), (7.8104469685, 13.3168584062), (7.899657011, 13.2602434809))
            ThreePointArc((7.899657011, 13.2602434809), (10.9885901476, 10.8392584909), (13.3670856415, 7.7174904934))
        make_face(mode=Mode.SUBTRACT)
    extrude(amount=F1_DEPTH)
    extrude(f1_2_sk.sketch, amount=-F1_DEPTH_BACK)

    # F14 (through all, one way)
    with BuildSketch(Plane.XZ):
        with Locations((-20.2660064272, 0), (-10.1330032136, -17.5508763992), (10.1330032136, -17.5508763992), (20.2660064272, 0), (10.1330032136, 17.5508763992), (-10.1330032136, 17.5508763992)):
            Circle(F14_D / 2)
    extrude(amount=-F14_DEPTH, mode=Mode.SUBTRACT)

    # F15 (one way)
    with BuildSketch(Plane(origin=(0, 0, 0), x_dir=(1, 0, 0), z_dir=(0, 1, 0))):
        with Locations((10.1330032136, 17.5508763992), (-10.1330032136, 17.5508763992), (-20.2660064272, 0), (-10.1330032136, -17.5508763992), (10.1330032136, -17.5508763992), (20.2660064272, 0)):
            Circle(F15_D / 2)
    extrude(amount=-F15_DEPTH, mode=Mode.SUBTRACT)
    with Locations(Plane(origin=(0, 0, 0), x_dir=(1, 0, 0), z_dir=(0, 1, 0))):
        with Locations((10.1330032136, 17.5508763992), (-10.1330032136, 17.5508763992), (-20.2660064272, 0), (-10.1330032136, -17.5508763992), (10.1330032136, -17.5508763992), (20.2660064272, 0)):
            with Locations((0, 0, -(F15_DEPTH + F15_TIP / 2))):  # 118° drill point
                Cone(0, F15_D / 2, F15_TIP, mode=Mode.SUBTRACT)


solid = Compound([f1.part, f1b.part])
